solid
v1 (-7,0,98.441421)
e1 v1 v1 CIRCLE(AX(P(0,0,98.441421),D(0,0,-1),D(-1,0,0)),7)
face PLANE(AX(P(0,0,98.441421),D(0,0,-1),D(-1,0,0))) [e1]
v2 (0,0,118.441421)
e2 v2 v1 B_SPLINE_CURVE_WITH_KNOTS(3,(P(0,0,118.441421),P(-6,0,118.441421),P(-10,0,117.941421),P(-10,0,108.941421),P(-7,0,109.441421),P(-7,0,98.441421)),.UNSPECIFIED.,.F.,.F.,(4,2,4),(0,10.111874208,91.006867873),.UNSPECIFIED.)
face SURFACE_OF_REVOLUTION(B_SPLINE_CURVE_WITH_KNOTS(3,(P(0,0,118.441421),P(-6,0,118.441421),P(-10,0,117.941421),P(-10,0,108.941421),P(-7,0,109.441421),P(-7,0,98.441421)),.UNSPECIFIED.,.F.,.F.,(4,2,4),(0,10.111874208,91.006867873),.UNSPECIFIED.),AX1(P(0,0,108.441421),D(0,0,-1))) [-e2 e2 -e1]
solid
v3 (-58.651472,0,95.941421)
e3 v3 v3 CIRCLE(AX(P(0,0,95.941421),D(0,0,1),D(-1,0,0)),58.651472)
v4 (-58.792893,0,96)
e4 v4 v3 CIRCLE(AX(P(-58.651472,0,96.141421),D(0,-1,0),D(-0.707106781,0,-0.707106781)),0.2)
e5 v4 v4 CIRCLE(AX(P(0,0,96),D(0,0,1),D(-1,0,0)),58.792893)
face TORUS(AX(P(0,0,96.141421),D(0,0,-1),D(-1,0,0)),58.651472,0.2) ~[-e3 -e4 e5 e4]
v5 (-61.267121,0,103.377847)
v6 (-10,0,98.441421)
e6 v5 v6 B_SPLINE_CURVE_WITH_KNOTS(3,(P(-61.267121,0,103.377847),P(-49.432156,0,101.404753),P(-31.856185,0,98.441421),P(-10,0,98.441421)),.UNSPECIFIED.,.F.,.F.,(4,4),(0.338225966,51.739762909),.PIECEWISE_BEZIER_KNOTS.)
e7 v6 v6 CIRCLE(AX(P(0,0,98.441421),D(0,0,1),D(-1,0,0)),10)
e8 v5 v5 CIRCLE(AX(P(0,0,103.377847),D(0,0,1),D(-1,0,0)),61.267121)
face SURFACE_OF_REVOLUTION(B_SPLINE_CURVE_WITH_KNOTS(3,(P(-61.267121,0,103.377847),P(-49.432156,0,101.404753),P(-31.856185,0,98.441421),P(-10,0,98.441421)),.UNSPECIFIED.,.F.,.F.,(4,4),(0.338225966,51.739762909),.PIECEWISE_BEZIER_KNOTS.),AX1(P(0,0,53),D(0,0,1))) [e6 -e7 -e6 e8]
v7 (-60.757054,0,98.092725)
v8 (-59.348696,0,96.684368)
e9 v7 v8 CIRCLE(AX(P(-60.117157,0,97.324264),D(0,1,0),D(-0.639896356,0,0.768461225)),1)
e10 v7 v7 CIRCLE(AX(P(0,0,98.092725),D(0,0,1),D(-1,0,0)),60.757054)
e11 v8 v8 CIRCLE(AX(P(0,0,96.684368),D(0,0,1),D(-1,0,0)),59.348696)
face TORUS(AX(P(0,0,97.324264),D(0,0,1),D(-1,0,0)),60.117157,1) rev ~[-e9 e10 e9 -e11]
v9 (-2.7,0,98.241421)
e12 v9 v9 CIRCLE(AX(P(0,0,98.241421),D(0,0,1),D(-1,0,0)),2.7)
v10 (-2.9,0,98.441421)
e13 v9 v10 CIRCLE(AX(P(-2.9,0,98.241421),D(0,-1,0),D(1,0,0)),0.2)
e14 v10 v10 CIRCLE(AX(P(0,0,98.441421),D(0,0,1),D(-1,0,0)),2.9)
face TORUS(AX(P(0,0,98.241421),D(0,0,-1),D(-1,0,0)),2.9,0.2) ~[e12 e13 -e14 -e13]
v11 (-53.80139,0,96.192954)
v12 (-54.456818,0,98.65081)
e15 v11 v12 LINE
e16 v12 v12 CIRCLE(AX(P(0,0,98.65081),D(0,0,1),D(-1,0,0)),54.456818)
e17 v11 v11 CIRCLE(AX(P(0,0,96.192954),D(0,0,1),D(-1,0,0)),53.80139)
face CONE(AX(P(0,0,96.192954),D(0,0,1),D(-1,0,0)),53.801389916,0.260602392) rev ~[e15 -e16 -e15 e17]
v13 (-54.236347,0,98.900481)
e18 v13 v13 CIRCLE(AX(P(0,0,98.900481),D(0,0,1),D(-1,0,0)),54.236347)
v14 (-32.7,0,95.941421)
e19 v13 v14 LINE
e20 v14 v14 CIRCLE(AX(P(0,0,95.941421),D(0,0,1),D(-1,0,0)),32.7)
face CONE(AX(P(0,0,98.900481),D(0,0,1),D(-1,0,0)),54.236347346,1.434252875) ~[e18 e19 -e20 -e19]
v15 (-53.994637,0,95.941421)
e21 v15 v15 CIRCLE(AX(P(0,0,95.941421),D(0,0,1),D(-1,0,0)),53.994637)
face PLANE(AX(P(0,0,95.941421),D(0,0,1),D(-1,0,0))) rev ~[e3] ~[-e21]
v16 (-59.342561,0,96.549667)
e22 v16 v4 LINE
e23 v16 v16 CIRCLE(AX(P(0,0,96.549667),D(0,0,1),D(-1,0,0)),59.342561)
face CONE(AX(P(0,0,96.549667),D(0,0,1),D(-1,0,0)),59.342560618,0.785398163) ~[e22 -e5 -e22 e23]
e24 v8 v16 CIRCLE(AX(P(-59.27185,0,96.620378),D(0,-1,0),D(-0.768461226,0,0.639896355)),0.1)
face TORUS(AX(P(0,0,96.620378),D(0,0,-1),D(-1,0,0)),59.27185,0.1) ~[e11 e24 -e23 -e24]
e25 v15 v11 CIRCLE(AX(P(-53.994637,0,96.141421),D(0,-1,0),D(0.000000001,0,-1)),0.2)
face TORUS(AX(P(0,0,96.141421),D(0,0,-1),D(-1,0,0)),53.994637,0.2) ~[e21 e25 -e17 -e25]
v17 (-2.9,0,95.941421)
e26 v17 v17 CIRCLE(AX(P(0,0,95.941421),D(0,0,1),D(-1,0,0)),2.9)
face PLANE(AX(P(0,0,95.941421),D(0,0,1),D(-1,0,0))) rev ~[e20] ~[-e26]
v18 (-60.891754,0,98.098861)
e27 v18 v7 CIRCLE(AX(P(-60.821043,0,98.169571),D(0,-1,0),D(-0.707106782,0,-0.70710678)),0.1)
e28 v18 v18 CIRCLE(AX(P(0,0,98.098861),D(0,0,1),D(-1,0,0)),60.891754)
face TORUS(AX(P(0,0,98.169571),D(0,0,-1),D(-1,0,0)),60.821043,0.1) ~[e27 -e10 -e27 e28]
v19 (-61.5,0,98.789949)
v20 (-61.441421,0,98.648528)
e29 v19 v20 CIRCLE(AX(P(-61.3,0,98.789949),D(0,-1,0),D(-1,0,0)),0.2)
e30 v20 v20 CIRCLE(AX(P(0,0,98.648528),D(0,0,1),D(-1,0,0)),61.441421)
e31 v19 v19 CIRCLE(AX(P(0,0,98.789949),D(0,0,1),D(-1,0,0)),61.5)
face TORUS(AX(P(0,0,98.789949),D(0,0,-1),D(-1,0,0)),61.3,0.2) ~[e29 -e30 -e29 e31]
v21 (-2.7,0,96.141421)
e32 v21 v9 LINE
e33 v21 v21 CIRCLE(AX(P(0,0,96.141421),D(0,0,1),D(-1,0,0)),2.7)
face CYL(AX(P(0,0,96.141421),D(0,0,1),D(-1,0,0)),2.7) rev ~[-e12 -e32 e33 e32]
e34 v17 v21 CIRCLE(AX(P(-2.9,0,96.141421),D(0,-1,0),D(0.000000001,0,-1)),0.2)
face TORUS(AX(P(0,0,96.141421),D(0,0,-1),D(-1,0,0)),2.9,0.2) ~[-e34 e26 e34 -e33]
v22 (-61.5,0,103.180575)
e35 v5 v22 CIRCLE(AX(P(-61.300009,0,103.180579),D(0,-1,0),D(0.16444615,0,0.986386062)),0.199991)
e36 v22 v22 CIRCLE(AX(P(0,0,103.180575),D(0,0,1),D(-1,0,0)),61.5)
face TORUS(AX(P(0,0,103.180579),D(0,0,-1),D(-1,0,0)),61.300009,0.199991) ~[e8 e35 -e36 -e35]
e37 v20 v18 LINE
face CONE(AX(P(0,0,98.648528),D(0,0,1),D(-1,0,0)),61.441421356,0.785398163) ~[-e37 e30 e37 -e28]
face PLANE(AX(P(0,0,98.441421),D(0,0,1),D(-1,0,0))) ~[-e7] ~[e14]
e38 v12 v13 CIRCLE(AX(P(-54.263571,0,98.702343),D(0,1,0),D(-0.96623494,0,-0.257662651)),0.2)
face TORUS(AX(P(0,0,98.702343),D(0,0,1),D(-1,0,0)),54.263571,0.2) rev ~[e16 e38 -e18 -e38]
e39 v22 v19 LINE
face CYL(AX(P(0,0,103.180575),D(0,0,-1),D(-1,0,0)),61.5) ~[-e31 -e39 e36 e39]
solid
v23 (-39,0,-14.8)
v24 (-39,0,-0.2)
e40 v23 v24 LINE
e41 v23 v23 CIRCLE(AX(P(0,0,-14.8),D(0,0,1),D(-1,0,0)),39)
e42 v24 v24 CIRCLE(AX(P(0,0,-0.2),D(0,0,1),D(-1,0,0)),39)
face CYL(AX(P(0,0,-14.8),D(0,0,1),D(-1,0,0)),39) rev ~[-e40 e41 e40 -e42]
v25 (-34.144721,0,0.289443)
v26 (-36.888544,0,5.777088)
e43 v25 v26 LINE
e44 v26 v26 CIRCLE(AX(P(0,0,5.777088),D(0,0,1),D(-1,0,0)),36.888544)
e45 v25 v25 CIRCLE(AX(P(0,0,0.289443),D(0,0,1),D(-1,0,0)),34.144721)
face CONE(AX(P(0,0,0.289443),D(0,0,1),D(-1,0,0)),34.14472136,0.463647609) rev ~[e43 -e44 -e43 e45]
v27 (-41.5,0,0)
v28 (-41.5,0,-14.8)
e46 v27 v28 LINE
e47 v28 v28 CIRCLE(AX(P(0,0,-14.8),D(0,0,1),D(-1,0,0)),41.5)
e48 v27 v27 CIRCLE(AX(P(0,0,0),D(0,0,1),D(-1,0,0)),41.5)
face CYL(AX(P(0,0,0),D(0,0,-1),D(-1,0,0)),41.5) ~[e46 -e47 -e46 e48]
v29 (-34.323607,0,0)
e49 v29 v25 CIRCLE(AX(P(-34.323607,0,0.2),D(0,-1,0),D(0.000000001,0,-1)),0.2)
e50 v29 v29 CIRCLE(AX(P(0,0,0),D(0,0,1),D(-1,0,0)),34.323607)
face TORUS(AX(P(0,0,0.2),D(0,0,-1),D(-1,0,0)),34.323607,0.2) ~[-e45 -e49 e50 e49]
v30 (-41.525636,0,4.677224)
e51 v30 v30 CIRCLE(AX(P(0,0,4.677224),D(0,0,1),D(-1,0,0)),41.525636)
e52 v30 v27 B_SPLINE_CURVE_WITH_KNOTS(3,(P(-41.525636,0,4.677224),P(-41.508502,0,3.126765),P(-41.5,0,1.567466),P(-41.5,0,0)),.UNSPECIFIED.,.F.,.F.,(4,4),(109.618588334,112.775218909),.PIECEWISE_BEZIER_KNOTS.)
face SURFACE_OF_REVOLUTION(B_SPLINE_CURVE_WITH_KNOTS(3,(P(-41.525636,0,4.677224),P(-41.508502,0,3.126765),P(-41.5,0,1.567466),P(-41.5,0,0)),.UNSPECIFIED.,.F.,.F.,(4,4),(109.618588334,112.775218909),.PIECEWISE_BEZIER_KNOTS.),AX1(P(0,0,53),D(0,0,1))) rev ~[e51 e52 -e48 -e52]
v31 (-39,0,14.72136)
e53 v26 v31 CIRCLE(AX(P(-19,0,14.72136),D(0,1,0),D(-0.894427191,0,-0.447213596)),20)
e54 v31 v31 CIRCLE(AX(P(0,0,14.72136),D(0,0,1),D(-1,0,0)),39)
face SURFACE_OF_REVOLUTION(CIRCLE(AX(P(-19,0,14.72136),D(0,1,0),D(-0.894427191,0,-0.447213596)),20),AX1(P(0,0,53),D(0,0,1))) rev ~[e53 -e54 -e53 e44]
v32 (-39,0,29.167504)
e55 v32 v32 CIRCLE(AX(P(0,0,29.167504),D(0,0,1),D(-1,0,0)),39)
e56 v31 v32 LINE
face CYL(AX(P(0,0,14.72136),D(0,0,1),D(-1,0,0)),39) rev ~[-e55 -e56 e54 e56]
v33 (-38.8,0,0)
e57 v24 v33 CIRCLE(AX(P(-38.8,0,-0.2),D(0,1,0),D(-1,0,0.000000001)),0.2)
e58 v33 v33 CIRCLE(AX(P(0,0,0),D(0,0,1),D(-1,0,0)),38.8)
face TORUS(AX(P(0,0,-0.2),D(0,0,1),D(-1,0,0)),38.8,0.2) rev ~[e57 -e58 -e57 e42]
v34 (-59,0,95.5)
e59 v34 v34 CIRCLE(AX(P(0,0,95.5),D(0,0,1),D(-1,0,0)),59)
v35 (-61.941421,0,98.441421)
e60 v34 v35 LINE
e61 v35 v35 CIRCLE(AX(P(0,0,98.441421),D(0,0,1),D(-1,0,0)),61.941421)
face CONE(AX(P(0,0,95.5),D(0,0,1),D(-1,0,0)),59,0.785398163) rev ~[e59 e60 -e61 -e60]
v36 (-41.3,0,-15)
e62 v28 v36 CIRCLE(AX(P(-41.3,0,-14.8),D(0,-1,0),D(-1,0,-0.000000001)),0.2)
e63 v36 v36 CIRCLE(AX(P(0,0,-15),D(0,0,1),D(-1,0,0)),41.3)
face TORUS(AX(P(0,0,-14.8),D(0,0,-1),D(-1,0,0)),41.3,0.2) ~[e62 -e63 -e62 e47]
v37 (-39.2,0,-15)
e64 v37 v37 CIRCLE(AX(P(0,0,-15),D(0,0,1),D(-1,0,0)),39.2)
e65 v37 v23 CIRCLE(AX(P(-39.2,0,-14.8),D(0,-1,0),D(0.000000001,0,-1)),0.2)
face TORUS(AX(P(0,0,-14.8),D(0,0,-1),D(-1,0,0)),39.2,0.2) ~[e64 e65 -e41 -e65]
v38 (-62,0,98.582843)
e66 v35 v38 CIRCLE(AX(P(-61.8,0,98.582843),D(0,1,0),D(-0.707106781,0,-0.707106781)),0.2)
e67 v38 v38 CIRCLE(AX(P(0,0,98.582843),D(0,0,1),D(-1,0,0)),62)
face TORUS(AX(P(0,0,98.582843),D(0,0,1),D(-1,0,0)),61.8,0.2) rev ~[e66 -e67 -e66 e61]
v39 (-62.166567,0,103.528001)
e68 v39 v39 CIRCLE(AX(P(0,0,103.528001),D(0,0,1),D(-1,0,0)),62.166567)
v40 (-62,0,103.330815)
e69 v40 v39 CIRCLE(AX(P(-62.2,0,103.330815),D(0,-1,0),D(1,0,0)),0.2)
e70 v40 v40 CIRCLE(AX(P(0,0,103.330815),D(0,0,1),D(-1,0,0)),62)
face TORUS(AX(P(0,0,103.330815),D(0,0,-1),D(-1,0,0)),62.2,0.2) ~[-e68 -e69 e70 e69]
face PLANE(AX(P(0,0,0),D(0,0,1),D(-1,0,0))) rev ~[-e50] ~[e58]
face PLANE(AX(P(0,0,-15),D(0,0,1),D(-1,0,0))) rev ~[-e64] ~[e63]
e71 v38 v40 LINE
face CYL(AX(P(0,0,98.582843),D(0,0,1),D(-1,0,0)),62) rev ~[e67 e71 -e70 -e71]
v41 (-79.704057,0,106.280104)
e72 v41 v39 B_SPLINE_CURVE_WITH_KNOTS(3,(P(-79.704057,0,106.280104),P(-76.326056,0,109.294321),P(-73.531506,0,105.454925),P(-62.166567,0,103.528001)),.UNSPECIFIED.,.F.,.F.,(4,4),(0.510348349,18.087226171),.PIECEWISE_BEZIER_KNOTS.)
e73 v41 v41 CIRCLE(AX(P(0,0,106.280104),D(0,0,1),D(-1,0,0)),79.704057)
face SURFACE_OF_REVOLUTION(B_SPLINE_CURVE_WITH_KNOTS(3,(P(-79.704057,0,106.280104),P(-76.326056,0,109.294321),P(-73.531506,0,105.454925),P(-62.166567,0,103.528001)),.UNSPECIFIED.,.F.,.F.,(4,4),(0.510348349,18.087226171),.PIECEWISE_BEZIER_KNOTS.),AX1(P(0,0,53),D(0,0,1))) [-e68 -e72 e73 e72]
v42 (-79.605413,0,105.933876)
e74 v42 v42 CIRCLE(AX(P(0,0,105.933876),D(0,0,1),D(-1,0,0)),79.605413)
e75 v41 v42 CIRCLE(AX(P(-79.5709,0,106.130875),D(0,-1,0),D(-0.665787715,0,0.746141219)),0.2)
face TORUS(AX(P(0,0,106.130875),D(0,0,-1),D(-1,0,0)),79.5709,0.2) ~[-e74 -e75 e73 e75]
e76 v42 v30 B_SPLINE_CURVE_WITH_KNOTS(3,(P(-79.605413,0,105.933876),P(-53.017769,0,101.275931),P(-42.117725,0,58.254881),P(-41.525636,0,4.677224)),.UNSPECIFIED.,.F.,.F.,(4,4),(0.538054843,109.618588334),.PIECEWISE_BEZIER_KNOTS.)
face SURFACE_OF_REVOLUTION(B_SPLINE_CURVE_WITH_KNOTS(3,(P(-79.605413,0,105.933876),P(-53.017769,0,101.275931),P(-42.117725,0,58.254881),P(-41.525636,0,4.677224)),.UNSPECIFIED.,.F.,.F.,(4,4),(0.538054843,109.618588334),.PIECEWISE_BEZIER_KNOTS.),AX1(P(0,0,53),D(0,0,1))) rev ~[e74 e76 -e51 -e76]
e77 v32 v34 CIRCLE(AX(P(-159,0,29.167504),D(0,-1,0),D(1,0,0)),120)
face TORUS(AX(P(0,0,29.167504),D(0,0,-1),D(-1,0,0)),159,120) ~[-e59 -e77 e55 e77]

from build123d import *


# Not quite as in the source:
# - ends of sketch curves that miss each other by under 0.0002 mm in the source are joined


with BuildPart() as f1:
    # F0 (on Front) → F1 (revolve)
    with BuildSketch(Plane.XZ):
        with BuildLine():
            ThreePointArc((-39.2, -15), (-39.0585786438, -14.9414213562), (-39, -14.8))
            Line((-39, -14.8), (-39, -0.2))
            ThreePointArc((-39, -0.2), (-38.9414213562, -0.0585786438), (-38.8, 0))
            Line((-38.8, 0), (-34.3236067977, 0))
            ThreePointArc((-34.3236067977, 0), (-34.1534766361, 0.0948537776), (-34.1447213595, 0.2894427191))
            Line((-34.1447213596, 0.2894427191), (-36.88854382, 5.77708764))
            ThreePointArc((-36.88854382, 5.77708764), (-38.4649797894, 10.126301139), (-39, 14.72135955))
            Line((-39, 14.72135955), (-39, 29.1675041929))
            ThreePointArc((-39, 29.1675041929), (-44.1087470692, 63.8085203443), (-59, 95.5))
            Line((-59, 95.5), (-61.9414213562, 98.4414213562))
            ThreePointArc((-61.9414213562, 98.4414213562), (-61.9847759065, 98.506306026), (-62, 98.5828427125))
            Line((-62, 98.5828427125), (-62, 103.3308152157))
            ThreePointArc((-62, 103.3308152157), (-62.0472149133, 103.459876121), (-62.1665671727, 103.5280010318))
            add(Edge.make_bspline(
                [(-79.7040573299, 106.2801035961), (-76.3260555853, 109.2943212913), (-73.531506087, 105.4549248188), (-62.1665671727, 103.5280010318)],
                knots=[0.510348349, 0.510348349, 0.510348349, 0.510348349, 18.0872261708, 18.0872261708, 18.0872261708, 18.0872261708], degree=3))
            ThreePointArc((-79.7040573299, 106.2801035961), (-79.7632452463, 106.0760736715), (-79.6054125719, 105.9338756882))
            add(Edge.make_bspline(
                [(-79.6054125719, 105.9338756882), (-53.0177693175, 101.275930607), (-42.1177251641, 58.2548807339), (-41.5256360973, 4.6772239645)],
                knots=[0.5380548431, 0.5380548431, 0.5380548431, 0.5380548431, 109.6185883344, 109.6185883344, 109.6185883344, 109.6185883344], degree=3))
            add(Edge.make_bspline(
                [(-41.5256360973, 4.6772239645), (-41.5085019086, 3.1267651973), (-41.5, 1.5674659193), (-41.5, 0)],
                knots=[109.6185883344, 109.6185883344, 109.6185883344, 109.6185883344, 112.7752189091, 112.7752189091, 112.7752189091, 112.7752189091], degree=3))
            Line((-41.5, 0), (-41.5, -14.8))
            ThreePointArc((-41.5, -14.8), (-41.4414213562, -14.9414213562), (-41.3, -15))
            Line((-41.3, -15), (-39.2, -15))
        make_face()
    revolve(axis=Axis((0, 0, 53), (0, 0, 1)))


with BuildPart() as f3:
    # F2 (on Front) → F3 (revolve)
    with BuildSketch(Plane.XZ):
        with BuildLine():
            ThreePointArc((-61.5, 98.7899494937), (-61.4847759065, 98.7134128072), (-61.4414213562, 98.6485281374))
            Line((-61.4414213562, 98.6485281374), (-60.8917539568, 98.098860738))
            ThreePointArc((-60.8917539568, 98.098860738), (-60.825593446, 98.0696749898), (-60.7570536431, 98.0927252936))
            ThreePointArc((-60.7570536431, 98.0927252936), (-59.4100505063, 98.0313708499), (-59.3486960627, 96.6843677131))
            ThreePointArc((-59.3486960627, 96.6843677131), (-59.3717463664, 96.6158279103), (-59.3425606183, 96.5496673995))
            Line((-59.3425606183, 96.5496673995), (-58.7928932188, 96))
            ThreePointArc((-58.7928932188, 96), (-58.728008549, 95.9566454497), (-58.6514718626, 95.9414213562))
            Line((-58.6514718626, 95.9414213562), (-53.9946369043, 95.9414213562))
            ThreePointArc((-53.9946369043, 95.9414213562), (-53.8360391332, 96.0195741282), (-53.8013899164, 96.1929538863))
            Line((-53.8013899164, 96.1929538863), (-54.4568182455, 98.6508101206))
            ThreePointArc((-54.4568182455, 98.6508101206), (-54.4134872982, 98.8347253564), (-54.236347346, 98.9004811342))
            Line((-54.236347346, 98.9004811342), (-32.7, 95.9414213562))
            Line((-32.7, 95.9414213562), (-2.9, 95.9414213562))
            ThreePointArc((-2.9, 95.9414213562), (-2.7585786438, 96), (-2.7, 96.1414213562))
            Line((-2.7, 96.1414213562), (-2.7, 98.2414213562))
            ThreePointArc((-2.7, 98.2414213562), (-2.7585786438, 98.3828427125), (-2.9, 98.4414213562))
            Line((-2.9, 98.4414213562), (-10, 98.4414213562))
            add(Edge.make_bspline(
                [(-61.2671212492, 103.3778470888), (-49.4321558211, 101.4047526307), (-31.8561846668, 98.4414213562), (-10, 98.4414213562)],
                knots=[0.3382259655, 0.3382259655, 0.3382259655, 0.3382259655, 51.7397629092, 51.7397629092, 51.7397629092, 51.7397629092], degree=3))
            ThreePointArc((-61.2671212492, 103.3778470888), (-61.4292749792, 103.3331785788), (-61.5, 103.1805745823))
            Line((-61.5, 103.1805745823), (-61.5, 98.7899494937))
        make_face()
    revolve(axis=Axis((0, 0, 53), (0, 0, 1)))


with BuildPart() as f5:
    # F4 (on Front) → F5 (revolve)
    with BuildSketch(Plane.XZ):
        with BuildLine():
            Line((0, 98.4414213562), (0, 118.4414213562))
            add(Edge.make_bspline(
                [(0, 118.4414213562), (-6, 118.4414213562), (-10, 117.9414213562), (-10, 116.9414213562)],
                knots=[0, 0, 0, 0, 10.1118742081, 10.1118742081, 10.1118742081, 10.1118742081], degree=3))
            add(Edge.make_bspline(
                [(-10, 116.9414213562), (-10, 108.9414213562), (-7.0000002161, 109.4414213562), (-7.0000002161, 98.4414213562)],
                knots=[0, 0, 0, 0, 18.7416647794, 18.7416647794, 18.7416647794, 18.7416647794], degree=3))
            Line((-7.0000002161, 98.4414213562), (0, 98.4414213562))
        make_face()
    revolve(axis=Axis((0, 0, 108.4414213562), (0, 0, -1)))


solid = Compound([f1.part, f3.part, f5.part])
